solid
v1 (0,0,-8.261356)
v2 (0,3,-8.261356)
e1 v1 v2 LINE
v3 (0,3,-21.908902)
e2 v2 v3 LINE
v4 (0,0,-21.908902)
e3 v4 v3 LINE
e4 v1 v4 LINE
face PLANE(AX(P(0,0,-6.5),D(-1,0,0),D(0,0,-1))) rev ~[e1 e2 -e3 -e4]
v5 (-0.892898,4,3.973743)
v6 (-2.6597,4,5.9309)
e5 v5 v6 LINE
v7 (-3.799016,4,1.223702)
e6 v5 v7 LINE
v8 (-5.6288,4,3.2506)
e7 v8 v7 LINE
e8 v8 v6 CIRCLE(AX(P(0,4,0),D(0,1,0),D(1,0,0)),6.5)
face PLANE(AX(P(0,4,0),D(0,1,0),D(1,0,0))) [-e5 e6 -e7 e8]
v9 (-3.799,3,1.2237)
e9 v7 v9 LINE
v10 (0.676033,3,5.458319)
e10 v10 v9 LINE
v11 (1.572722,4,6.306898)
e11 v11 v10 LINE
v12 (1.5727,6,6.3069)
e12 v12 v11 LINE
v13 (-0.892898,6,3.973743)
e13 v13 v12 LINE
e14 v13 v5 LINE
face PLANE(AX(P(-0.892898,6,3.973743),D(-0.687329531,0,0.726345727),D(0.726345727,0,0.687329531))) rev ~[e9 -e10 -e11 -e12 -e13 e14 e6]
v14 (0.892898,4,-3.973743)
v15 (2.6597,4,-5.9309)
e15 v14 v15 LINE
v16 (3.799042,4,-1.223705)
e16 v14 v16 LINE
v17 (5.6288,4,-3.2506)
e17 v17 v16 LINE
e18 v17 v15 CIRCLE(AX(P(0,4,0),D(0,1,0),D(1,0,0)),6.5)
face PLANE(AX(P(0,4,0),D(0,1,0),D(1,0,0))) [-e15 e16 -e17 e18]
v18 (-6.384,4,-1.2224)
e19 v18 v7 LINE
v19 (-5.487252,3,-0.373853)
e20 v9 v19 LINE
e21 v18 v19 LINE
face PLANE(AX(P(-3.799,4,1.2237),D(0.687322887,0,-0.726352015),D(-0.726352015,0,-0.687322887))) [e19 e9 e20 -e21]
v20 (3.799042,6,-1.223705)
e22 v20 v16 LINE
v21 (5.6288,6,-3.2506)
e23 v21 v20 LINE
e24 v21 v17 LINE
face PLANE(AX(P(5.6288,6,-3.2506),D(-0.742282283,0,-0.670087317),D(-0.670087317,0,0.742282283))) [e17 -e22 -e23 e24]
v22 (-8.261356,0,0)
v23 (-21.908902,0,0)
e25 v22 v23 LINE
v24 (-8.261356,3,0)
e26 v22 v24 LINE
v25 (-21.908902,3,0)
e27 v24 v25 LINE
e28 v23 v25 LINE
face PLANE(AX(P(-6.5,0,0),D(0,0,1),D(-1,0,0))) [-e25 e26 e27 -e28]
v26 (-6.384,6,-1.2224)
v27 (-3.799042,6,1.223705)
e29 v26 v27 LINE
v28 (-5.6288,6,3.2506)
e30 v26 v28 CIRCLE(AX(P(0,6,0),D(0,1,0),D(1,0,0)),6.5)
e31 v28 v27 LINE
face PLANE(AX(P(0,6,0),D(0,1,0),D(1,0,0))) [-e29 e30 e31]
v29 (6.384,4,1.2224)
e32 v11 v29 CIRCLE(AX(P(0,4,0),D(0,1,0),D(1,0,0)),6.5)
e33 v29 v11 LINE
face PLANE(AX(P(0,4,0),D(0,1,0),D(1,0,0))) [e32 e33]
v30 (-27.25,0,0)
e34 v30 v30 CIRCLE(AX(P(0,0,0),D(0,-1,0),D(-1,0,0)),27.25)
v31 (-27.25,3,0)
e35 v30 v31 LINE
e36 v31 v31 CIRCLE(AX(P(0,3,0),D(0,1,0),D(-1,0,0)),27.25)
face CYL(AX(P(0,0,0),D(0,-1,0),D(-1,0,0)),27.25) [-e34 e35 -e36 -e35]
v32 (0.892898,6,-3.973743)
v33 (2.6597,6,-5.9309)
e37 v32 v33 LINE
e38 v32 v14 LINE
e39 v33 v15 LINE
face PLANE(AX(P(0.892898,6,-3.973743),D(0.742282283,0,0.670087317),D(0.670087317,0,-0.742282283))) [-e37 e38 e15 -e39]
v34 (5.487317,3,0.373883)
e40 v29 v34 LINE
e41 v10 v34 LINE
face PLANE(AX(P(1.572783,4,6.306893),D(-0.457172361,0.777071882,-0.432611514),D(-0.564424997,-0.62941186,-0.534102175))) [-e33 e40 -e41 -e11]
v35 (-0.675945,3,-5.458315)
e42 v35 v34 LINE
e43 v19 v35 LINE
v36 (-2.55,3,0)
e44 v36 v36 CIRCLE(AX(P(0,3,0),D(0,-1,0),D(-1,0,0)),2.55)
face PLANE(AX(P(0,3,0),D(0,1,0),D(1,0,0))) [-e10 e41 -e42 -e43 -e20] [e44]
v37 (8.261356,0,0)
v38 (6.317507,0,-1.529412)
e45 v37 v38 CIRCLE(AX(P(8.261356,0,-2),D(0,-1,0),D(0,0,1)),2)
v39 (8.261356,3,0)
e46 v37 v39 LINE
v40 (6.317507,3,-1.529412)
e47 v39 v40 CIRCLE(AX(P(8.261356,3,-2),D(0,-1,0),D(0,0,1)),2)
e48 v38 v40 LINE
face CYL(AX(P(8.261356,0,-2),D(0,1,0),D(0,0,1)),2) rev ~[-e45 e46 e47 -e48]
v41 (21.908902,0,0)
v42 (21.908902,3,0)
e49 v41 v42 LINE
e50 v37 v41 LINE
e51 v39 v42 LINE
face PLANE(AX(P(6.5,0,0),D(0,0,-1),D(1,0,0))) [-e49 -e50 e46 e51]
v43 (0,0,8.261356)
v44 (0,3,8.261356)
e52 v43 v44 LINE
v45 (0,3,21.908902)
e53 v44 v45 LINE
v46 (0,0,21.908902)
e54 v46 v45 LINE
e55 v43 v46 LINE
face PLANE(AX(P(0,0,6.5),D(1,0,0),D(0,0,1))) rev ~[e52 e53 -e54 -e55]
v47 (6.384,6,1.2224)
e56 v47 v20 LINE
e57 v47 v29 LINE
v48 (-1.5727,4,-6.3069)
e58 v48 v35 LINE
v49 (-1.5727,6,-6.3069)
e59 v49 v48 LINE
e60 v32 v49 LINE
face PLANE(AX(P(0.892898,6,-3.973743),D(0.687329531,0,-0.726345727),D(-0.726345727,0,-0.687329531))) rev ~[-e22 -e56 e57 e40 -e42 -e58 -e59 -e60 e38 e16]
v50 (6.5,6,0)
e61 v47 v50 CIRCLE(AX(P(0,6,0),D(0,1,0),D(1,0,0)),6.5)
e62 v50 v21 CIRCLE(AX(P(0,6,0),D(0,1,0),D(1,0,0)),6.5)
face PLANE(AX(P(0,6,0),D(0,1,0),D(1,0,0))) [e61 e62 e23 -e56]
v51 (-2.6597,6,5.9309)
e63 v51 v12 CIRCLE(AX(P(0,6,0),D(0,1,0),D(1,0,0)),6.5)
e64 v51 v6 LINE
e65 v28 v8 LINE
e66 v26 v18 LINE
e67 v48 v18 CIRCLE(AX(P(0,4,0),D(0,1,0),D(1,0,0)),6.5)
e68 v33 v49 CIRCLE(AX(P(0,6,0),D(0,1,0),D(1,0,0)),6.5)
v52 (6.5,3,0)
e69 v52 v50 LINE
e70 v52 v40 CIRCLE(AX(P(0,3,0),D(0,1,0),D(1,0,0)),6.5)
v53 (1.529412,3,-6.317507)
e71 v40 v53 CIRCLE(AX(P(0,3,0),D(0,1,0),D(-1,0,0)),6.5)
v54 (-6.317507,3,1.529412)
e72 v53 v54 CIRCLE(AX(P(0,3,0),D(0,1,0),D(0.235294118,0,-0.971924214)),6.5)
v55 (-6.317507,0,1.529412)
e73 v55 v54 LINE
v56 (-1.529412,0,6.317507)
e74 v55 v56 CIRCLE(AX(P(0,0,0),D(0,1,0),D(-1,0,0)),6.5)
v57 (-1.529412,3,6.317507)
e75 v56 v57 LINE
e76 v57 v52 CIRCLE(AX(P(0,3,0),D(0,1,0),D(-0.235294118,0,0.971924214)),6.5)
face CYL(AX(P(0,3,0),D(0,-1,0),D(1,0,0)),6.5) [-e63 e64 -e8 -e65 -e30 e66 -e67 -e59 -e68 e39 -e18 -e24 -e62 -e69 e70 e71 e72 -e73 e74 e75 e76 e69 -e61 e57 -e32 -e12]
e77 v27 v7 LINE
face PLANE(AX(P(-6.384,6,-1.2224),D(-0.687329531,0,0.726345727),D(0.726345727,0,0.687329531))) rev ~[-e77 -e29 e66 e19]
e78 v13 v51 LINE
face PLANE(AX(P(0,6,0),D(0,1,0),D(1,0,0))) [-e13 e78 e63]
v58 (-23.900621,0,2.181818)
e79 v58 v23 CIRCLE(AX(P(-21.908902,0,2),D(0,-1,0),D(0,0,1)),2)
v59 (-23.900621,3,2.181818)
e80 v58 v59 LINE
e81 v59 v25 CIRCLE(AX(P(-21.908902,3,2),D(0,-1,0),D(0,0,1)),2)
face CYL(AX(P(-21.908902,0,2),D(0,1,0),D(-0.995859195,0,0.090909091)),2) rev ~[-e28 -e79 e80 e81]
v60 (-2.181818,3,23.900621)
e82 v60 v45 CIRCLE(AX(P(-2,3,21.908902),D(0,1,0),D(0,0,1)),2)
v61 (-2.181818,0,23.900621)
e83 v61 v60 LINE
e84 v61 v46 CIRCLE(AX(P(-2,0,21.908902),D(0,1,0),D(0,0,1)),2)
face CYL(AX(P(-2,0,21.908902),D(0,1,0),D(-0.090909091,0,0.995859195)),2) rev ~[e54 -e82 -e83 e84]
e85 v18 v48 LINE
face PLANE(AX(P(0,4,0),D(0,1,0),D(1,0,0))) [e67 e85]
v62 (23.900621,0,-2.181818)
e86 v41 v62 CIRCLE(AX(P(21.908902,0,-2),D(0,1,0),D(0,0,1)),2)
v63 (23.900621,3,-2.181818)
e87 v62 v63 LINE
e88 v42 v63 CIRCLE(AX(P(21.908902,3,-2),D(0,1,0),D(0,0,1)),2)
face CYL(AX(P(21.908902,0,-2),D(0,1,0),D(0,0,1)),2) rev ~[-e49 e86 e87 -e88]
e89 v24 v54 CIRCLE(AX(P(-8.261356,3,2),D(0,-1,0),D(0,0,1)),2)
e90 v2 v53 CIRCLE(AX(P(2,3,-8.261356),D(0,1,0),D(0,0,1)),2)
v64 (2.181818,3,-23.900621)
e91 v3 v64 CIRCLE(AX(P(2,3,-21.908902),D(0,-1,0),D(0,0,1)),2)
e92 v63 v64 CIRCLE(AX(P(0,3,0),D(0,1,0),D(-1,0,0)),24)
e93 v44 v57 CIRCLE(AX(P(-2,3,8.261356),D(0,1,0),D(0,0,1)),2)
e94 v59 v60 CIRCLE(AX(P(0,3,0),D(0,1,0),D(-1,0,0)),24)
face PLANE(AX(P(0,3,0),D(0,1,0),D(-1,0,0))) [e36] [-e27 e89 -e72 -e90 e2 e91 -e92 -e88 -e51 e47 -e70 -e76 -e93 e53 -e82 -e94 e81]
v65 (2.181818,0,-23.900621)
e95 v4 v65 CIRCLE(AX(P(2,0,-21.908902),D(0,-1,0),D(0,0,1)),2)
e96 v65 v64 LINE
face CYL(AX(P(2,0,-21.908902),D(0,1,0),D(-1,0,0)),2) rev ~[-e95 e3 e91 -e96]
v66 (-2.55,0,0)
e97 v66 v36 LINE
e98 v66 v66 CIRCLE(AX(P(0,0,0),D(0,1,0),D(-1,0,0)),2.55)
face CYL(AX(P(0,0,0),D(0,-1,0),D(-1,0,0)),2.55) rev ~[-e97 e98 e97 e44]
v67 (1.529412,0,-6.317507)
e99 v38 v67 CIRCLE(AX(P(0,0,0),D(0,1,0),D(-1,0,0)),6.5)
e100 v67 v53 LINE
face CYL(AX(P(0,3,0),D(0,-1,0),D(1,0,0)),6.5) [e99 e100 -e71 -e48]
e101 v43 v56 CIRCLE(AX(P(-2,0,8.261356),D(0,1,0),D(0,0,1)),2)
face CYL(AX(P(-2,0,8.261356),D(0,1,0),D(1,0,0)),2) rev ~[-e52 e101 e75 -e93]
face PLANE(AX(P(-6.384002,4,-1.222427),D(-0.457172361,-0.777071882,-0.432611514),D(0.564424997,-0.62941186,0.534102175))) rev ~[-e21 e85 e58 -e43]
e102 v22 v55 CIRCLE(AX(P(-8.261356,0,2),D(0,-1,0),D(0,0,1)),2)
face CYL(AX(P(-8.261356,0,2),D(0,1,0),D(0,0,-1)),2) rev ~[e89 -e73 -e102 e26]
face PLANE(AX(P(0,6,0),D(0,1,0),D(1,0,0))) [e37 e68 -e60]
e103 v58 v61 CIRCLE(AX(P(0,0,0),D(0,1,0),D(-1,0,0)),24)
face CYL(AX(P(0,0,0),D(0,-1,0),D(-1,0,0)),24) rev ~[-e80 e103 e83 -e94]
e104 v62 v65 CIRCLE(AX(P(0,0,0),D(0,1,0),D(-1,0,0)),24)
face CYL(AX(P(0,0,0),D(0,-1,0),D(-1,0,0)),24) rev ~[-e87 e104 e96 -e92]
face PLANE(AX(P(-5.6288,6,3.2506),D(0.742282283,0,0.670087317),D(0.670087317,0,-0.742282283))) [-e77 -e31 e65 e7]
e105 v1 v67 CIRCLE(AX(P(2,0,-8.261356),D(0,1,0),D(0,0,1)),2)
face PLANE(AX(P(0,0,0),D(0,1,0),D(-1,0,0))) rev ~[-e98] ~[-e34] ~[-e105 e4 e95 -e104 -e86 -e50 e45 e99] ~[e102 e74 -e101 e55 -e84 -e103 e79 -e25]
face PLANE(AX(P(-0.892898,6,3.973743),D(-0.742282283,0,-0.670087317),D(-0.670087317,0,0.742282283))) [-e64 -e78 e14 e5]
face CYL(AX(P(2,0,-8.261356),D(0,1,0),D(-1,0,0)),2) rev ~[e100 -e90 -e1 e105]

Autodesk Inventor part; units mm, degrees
ref_plane "YZ Plane" through (0, 0, 0) normal (1, 0, 0) x (0, 1, 0)
ref_plane "XZ Plane" through (0, 0, 0) normal (0, 1, 0) x (-1, 0, 0)
ref_plane "XY Plane" through (0, 0, 0) normal (0, 0, 1) x (1, 0, 0)
sketch "Sketch1" plane through (0, 0, 0) normal (0, 1, 0) x (-1, 0, 0)
  circle A0 centre (0, 0) radius 27.25
  line L0 (0, 0) -> (0, 27.25)
  line L1 (0, 0) -> (0, -27.25)
  line L2 (0, 0) -> (-27.25, 0)
  line L3 (0, 0) -> (27.25, 0)
  circle A1 centre (0, 0) radius 24
  circle A2 centre (0, 0) radius 2.55
  circle A3 centre (0, 0) radius 6.5
  point P0 (24, 0)
  point P1 (2.55, 0)
  point P2 (0, -2.55)
  point P3 (0, -24)
  point P4 (-24, 0)
  point P5 (-2.55, 0)
  point P6 (0, 2.55)
  point P7 (0, 24)
  point P8 (-6.5, 0)
  point P9 (0, -6.5)
  point P10 (6.5, 0)
  point P11 (0, 6.5)
  dimension "d0" = 54.5
  dimension "d1" = 48
  dimension "d2" = 5.1
  dimension "d5" = 13
extrude "Extrusion1" add sketch "Sketch1" along normal blind 3 contours L3 A1 L0 A0 | A0 L1 A1 L3 | L0 A1 L2 A0 | A0 L2 A1 L1 | A1 L1 A3 L3 | L0 A3 L2 A1 | A3 L1 A2 L3 | L3 A2 L0 A3 | L0 A2 L2 A3 | A3 L2 A2 L1
fillet "Fillet1" radius 2 8 edges at (-6.5, 1.5, 0) (0, 1.5, 6.5) (-24, 1.5, 0) (0, 1.5, 24) (0, 1.5, -24) (0, 1.5, -6.5) (24, 1.5, 0) (6.5, 1.5, 0)
sketch "Sketch2" plane through (0, 3, 0) normal (0, 1, 0) x (1, 0, 0)
  circle A0 centre (0, 0) radius 6.5
  dimension "d7" = 13
extrude "Extrusion2" add sketch "Sketch2" along normal blind 3
sketch "Sketch3" plane through (0, 6, 0) normal (0, 1, 0) x (1, 0, 0)
  point P0 (0, 0)
sketch "Sketch4" plane through (0, 6, 0) normal (0, 1, 0) x (1, 0, 0)
  circle A0 centre (0, 0) radius 6.5 projected
  line L0 (5.6288, 3.2506) -> (-2.6597, -5.9309)
  line L1 (-5.6288, -3.2506) -> (2.6597, 5.9309)
  arc A1 (-1.5294, -6.3175) -> (6.3175, 1.5294) centre (0, 0) ccw projected
  line L2 (6.384, -1.2224) -> (-1.5727, 6.3069)
  arc A2 (1.5294, 6.3175) -> (-6.3175, -1.5294) centre (0, 0) ccw projected
  line L3 (-6.384, 1.2224) -> (1.5727, -6.3069)
  point P0 (-3.799, -1.2237)
  point P1 (-0.8928, -3.9737)
  point P2 (3.799, 1.2237)
  point P3 (0.8928, 3.9737)
  point P4 (-1.5727, 6.3069)
  dimension "d10" = 4
  dimension "d11" = 2
  dimension "d12" = 7
  dimension "d13" = 3.5
extrude "Extrusion3" cut sketch "Sketch4" against normal blind 2 contours A0 L3 L0 L2 | L0 L2 L1 A0 | L0 L3 L1 L2 | L0 A0 L1 L3 | L1 L3 A0 L2
sketch "Sketch5" plane through (0, 4, 0) normal (0, 1, 0) x (1, 0, 0)
  arc A0 (1.5727, -6.3069) -> (6.384, -1.2224) centre (0, 0) ccw projected
  line L0 (-3.799, -1.2237) -> (-6.384, 1.2224) projected
  line L1 (1.5727, -6.3069) -> (-6.384, 1.2224)
  arc A1 (-1.5727, 6.3069) -> (-6.384, 1.2224) centre (0, 0) ccw projected
  line L2 (-6.384, 1.2224) -> (-1.5727, 6.3069)
  line L3 (-1.5727, 6.3069) -> (6.384, -1.2224)
  line L4 (6.384, -1.2224) -> (1.5727, -6.3069)
extrude "Extrusion4" cut sketch "Sketch5" against normal blind 1 contours L1 L0 L2 L3 L4
sketch "Sketch7" plane through (-3.799, 4, 1.2237) normal (0.6873266, 0, -0.7263485) x (-0.7263485, 0, -0.6873266)
  line L0 (3.5589, -1) -> (3.5589, 0) projected
  line L1 (-7.3956, -1) -> (3.5589, -1) projected
  line L2 (3.5589, 0) -> (2.3243, -1)
  line L3 (-3.671, -1) -> (3.5589, -1) projected
  line L4 (2.3243, -1) -> (3.5589, -1)
  line L5 (3.5589, -1) -> (3.5589, 0)
  line L6 (-7.3956, 0) -> (-7.3956, 2) projected
  line L7 (-7.3956, -1) -> (3.5589, -1) projected
  line L8 (-7.3956, 0) -> (-6.161, -1)
  line L9 (-7.3956, -1) -> (-5.1497, -1) projected
  line L10 (-6.161, -1) -> (-7.3956, -1)
  line L11 (-7.3956, -1) -> (-7.3956, 0)
  point P0 (-1.9184, -4)
extrude "Extrusion5" add sketch "Sketch7" along normal up to next
equation "\"BendRadius\" = Thickness"
equation "\"BendReliefWidth\" = Thickness"
equation "\"BendReliefDepth\" = 0.5 * Thickness"
equation "\"CornerReliefSize\" = 4 * Thickness"
equation "\"MinimumRemnant\" = 2 * Thickness"
equation "\"TransitionRadius\" = BendRadius"
equation "\"JacobiRadiusSize\" = BendRadius"
equation "\"GapSize\" = Thickness"
equation "\"Thickness\" = 0.5"
properties part number "_3DPrint"
